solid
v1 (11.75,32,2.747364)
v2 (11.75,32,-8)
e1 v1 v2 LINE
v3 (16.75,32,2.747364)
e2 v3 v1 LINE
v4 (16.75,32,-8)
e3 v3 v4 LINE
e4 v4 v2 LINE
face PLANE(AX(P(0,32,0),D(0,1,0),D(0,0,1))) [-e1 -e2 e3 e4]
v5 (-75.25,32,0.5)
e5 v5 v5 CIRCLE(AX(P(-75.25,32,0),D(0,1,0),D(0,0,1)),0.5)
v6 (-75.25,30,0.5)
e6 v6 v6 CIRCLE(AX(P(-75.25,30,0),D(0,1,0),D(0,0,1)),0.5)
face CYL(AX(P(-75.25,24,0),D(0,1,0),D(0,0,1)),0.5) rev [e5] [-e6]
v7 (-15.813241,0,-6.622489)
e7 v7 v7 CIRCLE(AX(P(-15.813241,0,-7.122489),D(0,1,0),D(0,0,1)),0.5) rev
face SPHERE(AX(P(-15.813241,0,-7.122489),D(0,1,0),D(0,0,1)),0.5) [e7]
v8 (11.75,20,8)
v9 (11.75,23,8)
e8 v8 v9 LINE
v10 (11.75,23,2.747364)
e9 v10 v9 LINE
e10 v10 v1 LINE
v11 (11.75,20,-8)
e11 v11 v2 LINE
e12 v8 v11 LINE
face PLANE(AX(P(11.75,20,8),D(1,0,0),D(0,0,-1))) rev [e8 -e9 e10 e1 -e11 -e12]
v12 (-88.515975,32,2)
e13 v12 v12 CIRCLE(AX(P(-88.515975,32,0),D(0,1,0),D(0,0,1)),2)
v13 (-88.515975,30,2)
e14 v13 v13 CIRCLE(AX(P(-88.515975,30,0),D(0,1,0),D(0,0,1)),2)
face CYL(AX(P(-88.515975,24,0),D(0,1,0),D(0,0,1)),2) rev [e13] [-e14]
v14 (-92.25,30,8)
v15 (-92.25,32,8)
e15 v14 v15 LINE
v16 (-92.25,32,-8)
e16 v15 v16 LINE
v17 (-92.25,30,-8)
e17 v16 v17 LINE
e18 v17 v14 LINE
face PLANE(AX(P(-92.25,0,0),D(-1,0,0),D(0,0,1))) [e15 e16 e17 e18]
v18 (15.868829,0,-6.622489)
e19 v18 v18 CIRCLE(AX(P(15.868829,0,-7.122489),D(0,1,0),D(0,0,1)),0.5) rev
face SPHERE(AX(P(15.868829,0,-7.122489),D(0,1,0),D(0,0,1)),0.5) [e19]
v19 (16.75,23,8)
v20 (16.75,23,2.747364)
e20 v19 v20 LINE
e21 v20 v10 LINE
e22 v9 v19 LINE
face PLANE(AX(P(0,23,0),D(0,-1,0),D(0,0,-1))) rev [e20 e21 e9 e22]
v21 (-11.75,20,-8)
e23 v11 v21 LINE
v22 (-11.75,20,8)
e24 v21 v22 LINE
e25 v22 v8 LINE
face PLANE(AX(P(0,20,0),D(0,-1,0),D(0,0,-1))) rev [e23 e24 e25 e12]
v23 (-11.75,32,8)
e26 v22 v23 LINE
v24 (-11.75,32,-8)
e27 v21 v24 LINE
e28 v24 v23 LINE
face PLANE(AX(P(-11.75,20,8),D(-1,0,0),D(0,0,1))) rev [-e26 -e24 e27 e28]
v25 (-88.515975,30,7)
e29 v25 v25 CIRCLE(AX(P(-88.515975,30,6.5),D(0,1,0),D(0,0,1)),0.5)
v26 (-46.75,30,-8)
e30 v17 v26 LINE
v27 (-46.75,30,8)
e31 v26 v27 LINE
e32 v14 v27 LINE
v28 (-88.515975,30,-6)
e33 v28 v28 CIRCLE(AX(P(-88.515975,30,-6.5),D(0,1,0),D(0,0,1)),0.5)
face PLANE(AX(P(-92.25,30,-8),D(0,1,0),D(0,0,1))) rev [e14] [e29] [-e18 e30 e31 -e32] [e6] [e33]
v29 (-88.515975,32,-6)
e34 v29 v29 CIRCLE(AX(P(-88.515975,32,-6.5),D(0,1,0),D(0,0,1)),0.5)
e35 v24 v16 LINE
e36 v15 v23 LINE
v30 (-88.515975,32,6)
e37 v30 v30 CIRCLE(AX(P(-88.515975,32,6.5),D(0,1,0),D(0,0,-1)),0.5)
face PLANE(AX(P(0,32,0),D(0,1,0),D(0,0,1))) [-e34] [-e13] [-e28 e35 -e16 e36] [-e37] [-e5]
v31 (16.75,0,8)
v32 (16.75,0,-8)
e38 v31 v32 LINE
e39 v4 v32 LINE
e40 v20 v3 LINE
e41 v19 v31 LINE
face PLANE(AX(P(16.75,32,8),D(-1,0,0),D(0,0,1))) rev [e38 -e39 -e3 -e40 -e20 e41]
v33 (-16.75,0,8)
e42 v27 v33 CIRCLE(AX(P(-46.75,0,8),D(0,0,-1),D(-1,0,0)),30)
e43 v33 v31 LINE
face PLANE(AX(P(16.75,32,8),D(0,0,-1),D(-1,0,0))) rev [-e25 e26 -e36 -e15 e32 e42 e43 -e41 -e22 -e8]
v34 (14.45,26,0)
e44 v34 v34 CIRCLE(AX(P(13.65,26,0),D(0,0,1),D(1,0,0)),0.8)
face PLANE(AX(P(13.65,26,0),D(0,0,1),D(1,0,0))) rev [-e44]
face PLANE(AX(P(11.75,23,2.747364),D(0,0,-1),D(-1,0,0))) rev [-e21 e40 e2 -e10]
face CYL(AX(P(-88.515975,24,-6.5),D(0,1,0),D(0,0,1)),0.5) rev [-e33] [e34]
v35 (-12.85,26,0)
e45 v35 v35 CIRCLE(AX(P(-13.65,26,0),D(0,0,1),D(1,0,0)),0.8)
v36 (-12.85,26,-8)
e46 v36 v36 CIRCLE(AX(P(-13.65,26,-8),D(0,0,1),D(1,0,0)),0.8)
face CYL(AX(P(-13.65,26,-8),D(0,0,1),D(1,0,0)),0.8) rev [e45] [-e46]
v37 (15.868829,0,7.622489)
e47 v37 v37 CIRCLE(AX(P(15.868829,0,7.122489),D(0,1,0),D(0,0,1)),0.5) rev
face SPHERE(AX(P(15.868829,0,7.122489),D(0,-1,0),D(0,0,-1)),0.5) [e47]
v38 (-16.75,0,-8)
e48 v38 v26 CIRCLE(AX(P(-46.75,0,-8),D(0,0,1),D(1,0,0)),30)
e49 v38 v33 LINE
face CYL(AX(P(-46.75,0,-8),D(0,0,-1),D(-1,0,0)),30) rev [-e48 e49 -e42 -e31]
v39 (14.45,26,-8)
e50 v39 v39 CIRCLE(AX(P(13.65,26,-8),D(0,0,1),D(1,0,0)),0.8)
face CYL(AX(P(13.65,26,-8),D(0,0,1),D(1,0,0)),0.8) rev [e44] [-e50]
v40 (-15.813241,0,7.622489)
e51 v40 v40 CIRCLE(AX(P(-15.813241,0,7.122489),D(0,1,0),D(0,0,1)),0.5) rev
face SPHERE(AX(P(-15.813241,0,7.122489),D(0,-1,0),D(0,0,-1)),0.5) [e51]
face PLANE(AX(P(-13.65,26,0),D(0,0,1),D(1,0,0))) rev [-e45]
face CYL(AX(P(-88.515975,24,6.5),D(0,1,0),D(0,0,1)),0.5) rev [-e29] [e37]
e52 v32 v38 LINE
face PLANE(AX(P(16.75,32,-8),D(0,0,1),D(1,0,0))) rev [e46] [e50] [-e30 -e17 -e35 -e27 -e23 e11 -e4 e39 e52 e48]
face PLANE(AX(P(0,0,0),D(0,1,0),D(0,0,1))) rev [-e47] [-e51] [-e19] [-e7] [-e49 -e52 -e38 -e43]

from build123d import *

# Parameters (mm, degrees)
SKETCH1_W           = 33.5
SKETCH1_H           = 16
BOSS_EXTRUDE1_DEPTH = 32
SKETCH2_W           = 23.5
SKETCH2_H           = 16
CUT_EXTRUDE1_DEPTH  = 12
SKETCH4_R           = 0.5
BOSS_EXTRUDE2_DEPTH = 0.5
FILLET1_R           = 0.5
SKETCH6_W           = 16
SKETCH6_H           = 2
BOSS_EXTRUDE3_DEPTH = 75.5
SKETCH7_W           = 5
SKETCH7_H           = 5.252635659
CUT_EXTRUDE2_DEPTH  = 9
SKETCH8_R           = 0.8
CUT_EXTRUDE3_DEPTH  = 8
SKETCH9_R           = 0.5
SKETCH9_R_2         = 2
CUT_EXTRUDE4_DEPTH  = 8
FILLET2_R           = 30


with BuildPart() as part:
    # Sketch1 → Boss-Extrude1 (new body)
    with BuildSketch(Plane(origin=(0, 0, 0), x_dir=(1, 0, 0), z_dir=(0, 1, 0))):
        Rectangle(SKETCH1_W, SKETCH1_H)
    extrude(amount=BOSS_EXTRUDE1_DEPTH)

    # Sketch2 → Cut-Extrude1 (cut)
    with BuildSketch(Plane(origin=(0, 32, 0), x_dir=(1, 0, 0), z_dir=(0, 1, 0))):
        Rectangle(SKETCH2_W, SKETCH2_H)
    extrude(amount=-CUT_EXTRUDE1_DEPTH, mode=Mode.SUBTRACT)

    # Sketch4 → Boss-Extrude2 (add)
    with BuildSketch(Plane(origin=(0, 0, 0), x_dir=(-1, 0, 0), z_dir=(0, -1, 0))):
        with Locations(Location((15.81324072, -7.12248893, 0), (0, 0, 270))):
            Circle(SKETCH4_R)
        with Locations(Location((-15.868829232, -7.12248893, 0), (0, 0, 270))):
            Circle(SKETCH4_R)
        with Locations(Location((-15.868829232, 7.12248893, 0), (0, 0, 270))):
            Circle(SKETCH4_R)
        with Locations(Location((15.81324072, 7.12248893, 0), (0, 0, 270))):
            Circle(SKETCH4_R)
    extrude(amount=BOSS_EXTRUDE2_DEPTH)

    # Fillet1
    fillet1_edges = [part.edges().sort_by_distance(p)[0] for p in [
        (-15.81324072, -0.5, 6.62248893),
        (15.868829232, -0.5, 6.62248893),
        (15.868829232, -0.5, -7.62248893),
        (-15.81324072, -0.5, -7.62248893),
    ]]
    fillet(fillet1_edges, radius=FILLET1_R - 0.0001)  # a hair under: the kernel refuses the full size

    # Sketch6 → Boss-Extrude3 (add)
    with BuildSketch(Plane.ZY.offset(16.75)):
        with Locations((0, 31)):
            Rectangle(SKETCH6_W, SKETCH6_H)
    extrude(amount=BOSS_EXTRUDE3_DEPTH)

    # Sketch7 → Cut-Extrude2 (cut)
    with BuildSketch(Plane(origin=(0, 32, 0), x_dir=(1, 0, 0), z_dir=(0, 1, 0))):
        with Locations((14.25, -5.373682171)):
            Rectangle(SKETCH7_W, SKETCH7_H)
    extrude(amount=-CUT_EXTRUDE2_DEPTH, mode=Mode.SUBTRACT)

    # Sketch8 → Cut-Extrude3 (cut)
    with BuildSketch(Plane.XY):
        with Locations((13.65, 26)):
            Circle(SKETCH8_R)
        with Locations((-13.65, 26)):
            Circle(SKETCH8_R)
    extrude(amount=-CUT_EXTRUDE3_DEPTH, mode=Mode.SUBTRACT)

    # Sketch9 → Cut-Extrude4 (cut)
    with BuildSketch(Plane(origin=(0, 32, 0), x_dir=(1, 0, 0), z_dir=(0, 1, 0))):
        with Locations(Location((-88.515974664, 6.5, 0), (0, 0, 270))):
            Circle(SKETCH9_R)
        with Locations(Location((-75.25, 0, 0), (0, 0, 270))):
            Circle(SKETCH9_R)
        with Locations(Location((-88.515974664, -6.5, 0), (0, 0, 270))):
            Circle(SKETCH9_R)
        with Locations(Location((-88.515974664, 0, 0), (0, 0, 270))):
            Circle(SKETCH9_R_2)
    extrude(amount=-CUT_EXTRUDE4_DEPTH, mode=Mode.SUBTRACT)

    # Fillet2
    fillet2_edges = [part.edges().sort_by_distance(p)[0] for p in [
        (-16.75, 30, 0),
    ]]
    fillet(fillet2_edges, radius=FILLET2_R - 0.0001)  # a hair under: the kernel refuses the full size


solid = part.part
